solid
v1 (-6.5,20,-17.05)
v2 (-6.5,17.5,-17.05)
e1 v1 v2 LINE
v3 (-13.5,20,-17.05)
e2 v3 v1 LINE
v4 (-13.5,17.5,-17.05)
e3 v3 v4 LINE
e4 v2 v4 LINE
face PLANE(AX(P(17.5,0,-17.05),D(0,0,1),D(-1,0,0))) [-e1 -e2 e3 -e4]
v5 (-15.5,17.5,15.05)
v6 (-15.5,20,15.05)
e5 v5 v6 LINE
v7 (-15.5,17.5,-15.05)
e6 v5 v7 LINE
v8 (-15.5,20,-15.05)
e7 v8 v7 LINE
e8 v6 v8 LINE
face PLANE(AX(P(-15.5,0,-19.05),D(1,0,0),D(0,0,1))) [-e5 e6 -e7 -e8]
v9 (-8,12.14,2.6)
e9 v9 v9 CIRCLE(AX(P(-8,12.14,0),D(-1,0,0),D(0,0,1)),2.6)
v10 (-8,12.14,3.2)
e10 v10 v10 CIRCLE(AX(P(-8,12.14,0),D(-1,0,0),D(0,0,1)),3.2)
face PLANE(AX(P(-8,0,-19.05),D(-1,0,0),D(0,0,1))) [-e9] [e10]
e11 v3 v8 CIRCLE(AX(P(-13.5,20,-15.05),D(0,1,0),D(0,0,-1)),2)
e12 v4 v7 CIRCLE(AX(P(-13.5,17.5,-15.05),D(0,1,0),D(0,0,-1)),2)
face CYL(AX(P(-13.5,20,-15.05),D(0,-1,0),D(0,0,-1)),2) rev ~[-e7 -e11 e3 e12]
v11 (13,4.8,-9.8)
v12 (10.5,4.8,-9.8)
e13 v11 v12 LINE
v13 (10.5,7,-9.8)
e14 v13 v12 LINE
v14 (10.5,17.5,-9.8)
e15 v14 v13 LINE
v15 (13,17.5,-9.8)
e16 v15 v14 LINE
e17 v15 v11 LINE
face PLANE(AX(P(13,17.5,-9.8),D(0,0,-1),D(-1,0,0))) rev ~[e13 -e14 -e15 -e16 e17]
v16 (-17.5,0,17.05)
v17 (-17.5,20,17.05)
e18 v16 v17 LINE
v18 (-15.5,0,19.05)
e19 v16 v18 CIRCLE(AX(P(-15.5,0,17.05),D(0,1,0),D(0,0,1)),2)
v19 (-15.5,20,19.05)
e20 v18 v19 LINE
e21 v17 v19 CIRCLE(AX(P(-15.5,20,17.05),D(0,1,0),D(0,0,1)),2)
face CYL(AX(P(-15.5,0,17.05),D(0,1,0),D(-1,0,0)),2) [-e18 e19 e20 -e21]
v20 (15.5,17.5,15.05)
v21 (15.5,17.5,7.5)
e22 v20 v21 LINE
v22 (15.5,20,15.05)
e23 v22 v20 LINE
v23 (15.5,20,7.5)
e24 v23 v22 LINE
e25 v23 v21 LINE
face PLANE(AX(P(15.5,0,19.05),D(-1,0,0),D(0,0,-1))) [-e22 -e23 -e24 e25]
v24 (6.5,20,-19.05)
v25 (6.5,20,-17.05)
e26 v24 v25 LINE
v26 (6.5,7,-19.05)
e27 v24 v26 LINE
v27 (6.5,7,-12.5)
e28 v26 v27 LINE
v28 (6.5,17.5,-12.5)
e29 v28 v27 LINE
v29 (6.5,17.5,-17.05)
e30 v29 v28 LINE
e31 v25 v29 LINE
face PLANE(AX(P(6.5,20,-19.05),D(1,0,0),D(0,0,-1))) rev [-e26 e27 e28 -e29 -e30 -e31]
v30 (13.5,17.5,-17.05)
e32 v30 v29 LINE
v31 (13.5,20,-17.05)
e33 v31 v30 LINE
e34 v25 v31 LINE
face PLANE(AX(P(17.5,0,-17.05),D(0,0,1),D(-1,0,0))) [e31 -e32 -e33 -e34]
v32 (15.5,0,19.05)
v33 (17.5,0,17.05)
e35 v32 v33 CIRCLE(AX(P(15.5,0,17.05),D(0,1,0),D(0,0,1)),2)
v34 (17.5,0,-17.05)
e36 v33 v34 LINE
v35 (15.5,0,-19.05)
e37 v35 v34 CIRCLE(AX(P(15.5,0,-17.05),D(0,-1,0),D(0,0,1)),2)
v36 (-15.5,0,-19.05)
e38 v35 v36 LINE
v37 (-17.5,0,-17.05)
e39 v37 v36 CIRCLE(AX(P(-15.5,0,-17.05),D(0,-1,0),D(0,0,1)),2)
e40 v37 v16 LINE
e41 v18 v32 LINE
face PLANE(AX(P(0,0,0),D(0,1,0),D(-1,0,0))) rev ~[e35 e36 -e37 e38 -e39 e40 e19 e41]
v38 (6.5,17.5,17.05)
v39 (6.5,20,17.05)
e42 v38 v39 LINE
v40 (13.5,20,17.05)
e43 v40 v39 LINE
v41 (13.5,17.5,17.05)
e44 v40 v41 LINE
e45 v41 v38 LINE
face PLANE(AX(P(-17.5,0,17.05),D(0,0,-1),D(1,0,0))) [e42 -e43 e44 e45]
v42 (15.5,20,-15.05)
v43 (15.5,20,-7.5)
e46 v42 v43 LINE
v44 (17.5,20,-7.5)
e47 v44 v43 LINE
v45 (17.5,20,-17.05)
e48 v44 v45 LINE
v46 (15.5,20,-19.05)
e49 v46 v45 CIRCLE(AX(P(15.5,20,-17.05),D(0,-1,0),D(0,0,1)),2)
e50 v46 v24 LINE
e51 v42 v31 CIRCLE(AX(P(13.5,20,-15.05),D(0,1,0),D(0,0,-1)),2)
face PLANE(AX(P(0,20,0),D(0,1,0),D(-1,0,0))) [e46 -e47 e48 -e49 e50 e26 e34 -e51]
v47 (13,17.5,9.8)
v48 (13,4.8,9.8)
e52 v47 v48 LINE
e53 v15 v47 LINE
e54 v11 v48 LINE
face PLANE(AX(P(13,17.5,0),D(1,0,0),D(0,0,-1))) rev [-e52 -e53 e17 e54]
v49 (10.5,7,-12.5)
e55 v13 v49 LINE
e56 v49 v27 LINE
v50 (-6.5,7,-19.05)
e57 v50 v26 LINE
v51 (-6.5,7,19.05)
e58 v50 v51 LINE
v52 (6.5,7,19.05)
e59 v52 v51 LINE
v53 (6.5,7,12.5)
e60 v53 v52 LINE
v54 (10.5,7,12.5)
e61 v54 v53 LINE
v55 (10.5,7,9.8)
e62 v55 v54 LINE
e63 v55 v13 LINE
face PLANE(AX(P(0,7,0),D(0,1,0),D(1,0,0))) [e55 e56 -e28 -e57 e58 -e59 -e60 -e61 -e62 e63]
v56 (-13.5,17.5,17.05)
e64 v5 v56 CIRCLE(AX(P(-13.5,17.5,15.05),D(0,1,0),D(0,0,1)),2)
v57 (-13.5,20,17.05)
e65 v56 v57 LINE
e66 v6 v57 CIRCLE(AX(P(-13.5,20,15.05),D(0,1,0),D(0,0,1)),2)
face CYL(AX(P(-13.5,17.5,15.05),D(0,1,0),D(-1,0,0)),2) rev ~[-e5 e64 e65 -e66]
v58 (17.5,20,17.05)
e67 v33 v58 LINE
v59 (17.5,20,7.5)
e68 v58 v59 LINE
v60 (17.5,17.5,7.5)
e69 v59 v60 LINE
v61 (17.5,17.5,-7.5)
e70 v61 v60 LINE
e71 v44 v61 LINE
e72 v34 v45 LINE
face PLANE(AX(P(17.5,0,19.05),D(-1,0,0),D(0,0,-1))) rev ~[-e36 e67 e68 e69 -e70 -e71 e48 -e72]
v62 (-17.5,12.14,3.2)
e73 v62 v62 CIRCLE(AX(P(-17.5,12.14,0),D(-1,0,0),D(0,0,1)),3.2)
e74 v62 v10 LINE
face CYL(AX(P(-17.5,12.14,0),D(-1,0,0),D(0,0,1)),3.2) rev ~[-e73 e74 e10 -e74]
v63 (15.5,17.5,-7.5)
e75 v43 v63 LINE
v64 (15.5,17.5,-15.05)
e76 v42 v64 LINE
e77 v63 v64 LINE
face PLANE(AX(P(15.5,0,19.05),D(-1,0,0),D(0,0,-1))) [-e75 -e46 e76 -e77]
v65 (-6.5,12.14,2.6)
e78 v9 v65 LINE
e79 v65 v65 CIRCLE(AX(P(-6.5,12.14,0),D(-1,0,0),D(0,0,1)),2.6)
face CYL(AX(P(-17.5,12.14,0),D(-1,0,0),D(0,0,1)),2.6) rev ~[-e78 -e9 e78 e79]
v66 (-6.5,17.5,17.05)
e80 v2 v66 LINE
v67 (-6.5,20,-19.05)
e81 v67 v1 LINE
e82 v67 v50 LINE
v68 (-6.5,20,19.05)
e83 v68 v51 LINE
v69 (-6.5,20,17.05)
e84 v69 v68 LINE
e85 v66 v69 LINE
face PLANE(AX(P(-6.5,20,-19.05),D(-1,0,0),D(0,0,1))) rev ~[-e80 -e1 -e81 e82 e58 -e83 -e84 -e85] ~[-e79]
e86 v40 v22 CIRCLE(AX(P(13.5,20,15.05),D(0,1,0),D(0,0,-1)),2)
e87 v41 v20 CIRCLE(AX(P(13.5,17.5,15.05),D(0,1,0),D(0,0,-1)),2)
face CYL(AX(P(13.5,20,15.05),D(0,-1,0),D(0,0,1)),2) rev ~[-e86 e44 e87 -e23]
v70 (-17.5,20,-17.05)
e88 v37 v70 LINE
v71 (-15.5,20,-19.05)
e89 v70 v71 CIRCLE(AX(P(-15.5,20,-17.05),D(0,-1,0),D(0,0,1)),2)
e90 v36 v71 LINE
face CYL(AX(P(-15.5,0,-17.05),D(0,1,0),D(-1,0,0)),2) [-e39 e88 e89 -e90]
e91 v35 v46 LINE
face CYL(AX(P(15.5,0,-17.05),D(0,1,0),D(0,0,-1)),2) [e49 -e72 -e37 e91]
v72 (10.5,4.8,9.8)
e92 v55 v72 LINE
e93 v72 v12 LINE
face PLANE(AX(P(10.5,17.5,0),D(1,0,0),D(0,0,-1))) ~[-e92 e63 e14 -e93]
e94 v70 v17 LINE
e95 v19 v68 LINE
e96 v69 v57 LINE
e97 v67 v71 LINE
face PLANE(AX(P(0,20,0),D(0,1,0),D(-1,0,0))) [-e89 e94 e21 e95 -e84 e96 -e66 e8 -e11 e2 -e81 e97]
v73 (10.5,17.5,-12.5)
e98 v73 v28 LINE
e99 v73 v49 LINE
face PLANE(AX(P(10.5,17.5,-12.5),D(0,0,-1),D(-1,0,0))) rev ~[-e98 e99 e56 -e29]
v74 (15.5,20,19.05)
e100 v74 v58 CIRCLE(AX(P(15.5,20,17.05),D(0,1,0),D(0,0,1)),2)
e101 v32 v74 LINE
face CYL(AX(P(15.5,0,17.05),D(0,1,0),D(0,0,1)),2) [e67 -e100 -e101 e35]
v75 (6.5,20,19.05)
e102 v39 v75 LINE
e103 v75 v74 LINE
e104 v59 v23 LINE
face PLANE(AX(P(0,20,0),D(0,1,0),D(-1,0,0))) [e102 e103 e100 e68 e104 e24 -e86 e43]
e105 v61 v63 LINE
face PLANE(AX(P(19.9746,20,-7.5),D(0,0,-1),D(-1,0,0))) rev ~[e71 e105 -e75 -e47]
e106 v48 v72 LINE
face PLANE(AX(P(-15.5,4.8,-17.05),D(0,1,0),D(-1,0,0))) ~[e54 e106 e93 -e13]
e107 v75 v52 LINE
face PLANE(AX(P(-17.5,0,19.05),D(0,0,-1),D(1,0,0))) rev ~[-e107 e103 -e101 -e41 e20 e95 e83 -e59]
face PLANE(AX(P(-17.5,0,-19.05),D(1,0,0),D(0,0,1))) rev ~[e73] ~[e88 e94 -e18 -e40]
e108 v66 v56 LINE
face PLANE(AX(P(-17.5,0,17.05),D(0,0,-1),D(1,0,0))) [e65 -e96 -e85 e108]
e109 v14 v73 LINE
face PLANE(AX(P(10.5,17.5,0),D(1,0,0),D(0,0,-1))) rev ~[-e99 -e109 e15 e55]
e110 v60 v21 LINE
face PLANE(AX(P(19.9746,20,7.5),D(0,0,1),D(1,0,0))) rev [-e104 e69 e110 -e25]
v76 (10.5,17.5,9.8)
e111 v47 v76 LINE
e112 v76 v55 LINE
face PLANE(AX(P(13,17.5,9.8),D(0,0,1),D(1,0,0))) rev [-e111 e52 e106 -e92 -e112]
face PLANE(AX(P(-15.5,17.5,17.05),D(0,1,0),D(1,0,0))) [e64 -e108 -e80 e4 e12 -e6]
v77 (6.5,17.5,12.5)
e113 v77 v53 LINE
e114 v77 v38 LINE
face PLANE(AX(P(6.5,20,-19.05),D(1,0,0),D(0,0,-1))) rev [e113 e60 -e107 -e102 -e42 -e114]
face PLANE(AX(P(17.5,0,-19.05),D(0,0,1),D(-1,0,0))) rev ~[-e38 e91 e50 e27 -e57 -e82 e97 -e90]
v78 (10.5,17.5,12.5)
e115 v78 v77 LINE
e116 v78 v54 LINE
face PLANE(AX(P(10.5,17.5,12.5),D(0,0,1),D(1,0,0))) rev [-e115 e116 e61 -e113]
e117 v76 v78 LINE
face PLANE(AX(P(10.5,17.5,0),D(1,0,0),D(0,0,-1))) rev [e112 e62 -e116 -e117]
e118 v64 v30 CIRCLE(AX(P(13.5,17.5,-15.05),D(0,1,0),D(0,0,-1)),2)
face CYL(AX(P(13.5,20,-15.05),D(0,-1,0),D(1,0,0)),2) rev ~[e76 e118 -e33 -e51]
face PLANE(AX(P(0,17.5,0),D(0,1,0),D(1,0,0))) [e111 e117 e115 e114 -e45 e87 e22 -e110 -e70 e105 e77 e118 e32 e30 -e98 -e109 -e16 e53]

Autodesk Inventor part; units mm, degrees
ref_plane "YZ Plane" through (0, 0, 0) normal (1, 0, 0) x (0, 1, 0)
sketch "Sketch1" plane through (0, 0, 0) normal (0, 1, 0) x (-1, 0, 0)
  line L0 (17.5, 19.05) -> (-17.5, 19.05)
  line L1 (-17.5, 19.05) -> (-17.5, -19.05)
  line L2 (-17.5, -19.05) -> (17.5, -19.05)
  line L3 (17.5, -19.05) -> (17.5, 19.05)
  line L4 (17.5, 19.05) -> (-17.5, -19.05) construction
  line L5 (-17.5, 19.05) -> (17.5, -19.05) construction
  point P0 (0, 0)
  dimension "d0" = 38.1
  dimension "d1" = 35
extrude "Extrusion1" add sketch "Sketch1" along normal blind 20
shell "Shell1" thickness 2 removed faces 1 at (5.8333, 20, -6.35)
sketch "Sketch2" plane through (-15.5, 2, 17.05) normal (0, 1, 0) x (1, 0, 0)
  line L0 (31, 34.1) -> (0, 34.1) projected
  line L1 (31, 0) -> (31, 34.1) projected
  line L2 (0, 34.1) -> (31, 34.1)
  line L3 (31, 34.1) -> (31, 0)
  line L4 (31, 0) -> (0, 0)
  line L5 (0, 0) -> (0, 34.1)
  point P0 (15.5, 17.05)
extrude "Extrusion2" add sketch "Sketch2" along normal blind 15.5
sketch "Sketch3" plane through (0, 20, 0) normal (0, 1, 0) x (1, 0, 0)
  line L0 (17.5, 19.05) -> (-17.5, 19.05) projected
  line L1 (-17.5, -19.05) -> (17.5, -19.05) projected
  line L2 (0, 19.05) -> (-6.5, 19.05)
  line L3 (-6.5, 19.05) -> (-6.5, -19.05)
  line L4 (-6.5, -19.05) -> (0, -19.05)
  line L5 (0, -19.05) -> (0, 19.05)
  point P0 (0, 0)
  dimension "d7" = 6.5
extrude "Extrusion3" cut sketch "Sketch3" against normal blind 13
ref_plane "Work Plane1" through (0, 20, -19.05) normal (-1, 0, 0) x (0, 0, 1)
mirror "Mirror1" about plane through (0, 20, -19.05) normal (-1, 0, 0) of "Extrusion3"
sketch "Sketch4" plane through (-15.5, 17.5, 17.05) normal (0, 1, 0) x (1, 0, 0)
  line L0 (22, -2) -> (22, 36.1) projected
  line L1 (22, 17.05) -> (26, 17.05)
  line L2 (26, 17.05) -> (26, 29.55)
  line L3 (26, 29.55) -> (22, 29.55)
  line L4 (22, 29.55) -> (22, 17.05)
  point P0 (15.5, 17.05)
  dimension "d11" = 4
  dimension "d12" = 12.5
extrude "Extrusion4" cut sketch "Sketch4" against normal up to surface (10.5 mm away)
sketch "Sketch5" plane through (-15.5, 17.5, 17.05) normal (0, 1, 0) x (1, 0, 0)
  line L0 (26, 17.05) -> (26, 29.55) projected
  line L1 (26, 17.05) -> (28.5, 17.05)
  line L2 (28.5, 17.05) -> (28.5, 26.85)
  line L3 (28.5, 26.85) -> (26, 26.85)
  line L4 (26, 26.85) -> (26, 17.05)
  point P0 (15.5, 17.05)
  dimension "d15" = 9.8
  dimension "d16" = 2.5
extrude "Extrusion5" cut sketch "Sketch5" against normal blind 12.7
sketch "Sketch6" plane through (0, 20, 0) normal (0, 1, 0) x (1, 0, 0)
  line L0 (15.5, 17.05) -> (15.5, -17.05) projected
  line L1 (15.5, 0) -> (19.9746, 0)
  line L2 (19.9746, 0) -> (19.9746, 7.5)
  line L3 (19.9746, 7.5) -> (15.5, 7.5)
  line L4 (15.5, 7.5) -> (15.5, 0)
  point P0 (0, 0)
  dimension "d19" = 7.5
extrude "Extrusion6" cut sketch "Sketch6" against normal up to surface (2.5 mm away)
ref_plane "Work Plane2" through (6.5, 7, 0) normal (0, 0, -1) x (-1, 0, 0)
mirror "Mirror2" about plane through (6.5, 7, 0) normal (0, 0, -1) of "Extrusion4", "Extrusion5", "Extrusion6"
sketch "Sketch7" plane through (-17.5, 0, -19.05) normal (-1, 0, 0) x (0, 0, 1)
  circle A0 centre (19.05, 12.14) radius 2.6
  line L0 (0, 20) -> (38.1, 20) projected
  point P0 (19.05, 0)
  dimension "d23" = 5.2
  dimension "d24" = 7.86
extrude "Extrusion7" cut sketch "Sketch7" against normal up to surface (11 mm away)
sketch "Sketch8" plane through (-17.5, 0, -19.05) normal (-1, 0, 0) x (0, 0, 1)
  circle A0 centre (19.05, 12.14) radius 2.6 projected
  circle A1 centre (19.05, 12.14) radius 3.2
  point P0 (19.05, 0)
  dimension "d27" = 6.4
extrude "Extrusion8" cut sketch "Sketch8" against normal blind 9.5
fillet "Fillet1" radius 2 8 edges at (15.5, 18.75, -17.05) (-15.5, 18.75, -17.05) (-15.5, 18.75, 17.05) (15.5, 18.75, 17.05) (-17.5, 10, 19.05) (17.5, 10, 19.05) (17.5, 10, -19.05) (-17.5, 10, -19.05)
properties part number "Enclosure_Bottom V1D6"
